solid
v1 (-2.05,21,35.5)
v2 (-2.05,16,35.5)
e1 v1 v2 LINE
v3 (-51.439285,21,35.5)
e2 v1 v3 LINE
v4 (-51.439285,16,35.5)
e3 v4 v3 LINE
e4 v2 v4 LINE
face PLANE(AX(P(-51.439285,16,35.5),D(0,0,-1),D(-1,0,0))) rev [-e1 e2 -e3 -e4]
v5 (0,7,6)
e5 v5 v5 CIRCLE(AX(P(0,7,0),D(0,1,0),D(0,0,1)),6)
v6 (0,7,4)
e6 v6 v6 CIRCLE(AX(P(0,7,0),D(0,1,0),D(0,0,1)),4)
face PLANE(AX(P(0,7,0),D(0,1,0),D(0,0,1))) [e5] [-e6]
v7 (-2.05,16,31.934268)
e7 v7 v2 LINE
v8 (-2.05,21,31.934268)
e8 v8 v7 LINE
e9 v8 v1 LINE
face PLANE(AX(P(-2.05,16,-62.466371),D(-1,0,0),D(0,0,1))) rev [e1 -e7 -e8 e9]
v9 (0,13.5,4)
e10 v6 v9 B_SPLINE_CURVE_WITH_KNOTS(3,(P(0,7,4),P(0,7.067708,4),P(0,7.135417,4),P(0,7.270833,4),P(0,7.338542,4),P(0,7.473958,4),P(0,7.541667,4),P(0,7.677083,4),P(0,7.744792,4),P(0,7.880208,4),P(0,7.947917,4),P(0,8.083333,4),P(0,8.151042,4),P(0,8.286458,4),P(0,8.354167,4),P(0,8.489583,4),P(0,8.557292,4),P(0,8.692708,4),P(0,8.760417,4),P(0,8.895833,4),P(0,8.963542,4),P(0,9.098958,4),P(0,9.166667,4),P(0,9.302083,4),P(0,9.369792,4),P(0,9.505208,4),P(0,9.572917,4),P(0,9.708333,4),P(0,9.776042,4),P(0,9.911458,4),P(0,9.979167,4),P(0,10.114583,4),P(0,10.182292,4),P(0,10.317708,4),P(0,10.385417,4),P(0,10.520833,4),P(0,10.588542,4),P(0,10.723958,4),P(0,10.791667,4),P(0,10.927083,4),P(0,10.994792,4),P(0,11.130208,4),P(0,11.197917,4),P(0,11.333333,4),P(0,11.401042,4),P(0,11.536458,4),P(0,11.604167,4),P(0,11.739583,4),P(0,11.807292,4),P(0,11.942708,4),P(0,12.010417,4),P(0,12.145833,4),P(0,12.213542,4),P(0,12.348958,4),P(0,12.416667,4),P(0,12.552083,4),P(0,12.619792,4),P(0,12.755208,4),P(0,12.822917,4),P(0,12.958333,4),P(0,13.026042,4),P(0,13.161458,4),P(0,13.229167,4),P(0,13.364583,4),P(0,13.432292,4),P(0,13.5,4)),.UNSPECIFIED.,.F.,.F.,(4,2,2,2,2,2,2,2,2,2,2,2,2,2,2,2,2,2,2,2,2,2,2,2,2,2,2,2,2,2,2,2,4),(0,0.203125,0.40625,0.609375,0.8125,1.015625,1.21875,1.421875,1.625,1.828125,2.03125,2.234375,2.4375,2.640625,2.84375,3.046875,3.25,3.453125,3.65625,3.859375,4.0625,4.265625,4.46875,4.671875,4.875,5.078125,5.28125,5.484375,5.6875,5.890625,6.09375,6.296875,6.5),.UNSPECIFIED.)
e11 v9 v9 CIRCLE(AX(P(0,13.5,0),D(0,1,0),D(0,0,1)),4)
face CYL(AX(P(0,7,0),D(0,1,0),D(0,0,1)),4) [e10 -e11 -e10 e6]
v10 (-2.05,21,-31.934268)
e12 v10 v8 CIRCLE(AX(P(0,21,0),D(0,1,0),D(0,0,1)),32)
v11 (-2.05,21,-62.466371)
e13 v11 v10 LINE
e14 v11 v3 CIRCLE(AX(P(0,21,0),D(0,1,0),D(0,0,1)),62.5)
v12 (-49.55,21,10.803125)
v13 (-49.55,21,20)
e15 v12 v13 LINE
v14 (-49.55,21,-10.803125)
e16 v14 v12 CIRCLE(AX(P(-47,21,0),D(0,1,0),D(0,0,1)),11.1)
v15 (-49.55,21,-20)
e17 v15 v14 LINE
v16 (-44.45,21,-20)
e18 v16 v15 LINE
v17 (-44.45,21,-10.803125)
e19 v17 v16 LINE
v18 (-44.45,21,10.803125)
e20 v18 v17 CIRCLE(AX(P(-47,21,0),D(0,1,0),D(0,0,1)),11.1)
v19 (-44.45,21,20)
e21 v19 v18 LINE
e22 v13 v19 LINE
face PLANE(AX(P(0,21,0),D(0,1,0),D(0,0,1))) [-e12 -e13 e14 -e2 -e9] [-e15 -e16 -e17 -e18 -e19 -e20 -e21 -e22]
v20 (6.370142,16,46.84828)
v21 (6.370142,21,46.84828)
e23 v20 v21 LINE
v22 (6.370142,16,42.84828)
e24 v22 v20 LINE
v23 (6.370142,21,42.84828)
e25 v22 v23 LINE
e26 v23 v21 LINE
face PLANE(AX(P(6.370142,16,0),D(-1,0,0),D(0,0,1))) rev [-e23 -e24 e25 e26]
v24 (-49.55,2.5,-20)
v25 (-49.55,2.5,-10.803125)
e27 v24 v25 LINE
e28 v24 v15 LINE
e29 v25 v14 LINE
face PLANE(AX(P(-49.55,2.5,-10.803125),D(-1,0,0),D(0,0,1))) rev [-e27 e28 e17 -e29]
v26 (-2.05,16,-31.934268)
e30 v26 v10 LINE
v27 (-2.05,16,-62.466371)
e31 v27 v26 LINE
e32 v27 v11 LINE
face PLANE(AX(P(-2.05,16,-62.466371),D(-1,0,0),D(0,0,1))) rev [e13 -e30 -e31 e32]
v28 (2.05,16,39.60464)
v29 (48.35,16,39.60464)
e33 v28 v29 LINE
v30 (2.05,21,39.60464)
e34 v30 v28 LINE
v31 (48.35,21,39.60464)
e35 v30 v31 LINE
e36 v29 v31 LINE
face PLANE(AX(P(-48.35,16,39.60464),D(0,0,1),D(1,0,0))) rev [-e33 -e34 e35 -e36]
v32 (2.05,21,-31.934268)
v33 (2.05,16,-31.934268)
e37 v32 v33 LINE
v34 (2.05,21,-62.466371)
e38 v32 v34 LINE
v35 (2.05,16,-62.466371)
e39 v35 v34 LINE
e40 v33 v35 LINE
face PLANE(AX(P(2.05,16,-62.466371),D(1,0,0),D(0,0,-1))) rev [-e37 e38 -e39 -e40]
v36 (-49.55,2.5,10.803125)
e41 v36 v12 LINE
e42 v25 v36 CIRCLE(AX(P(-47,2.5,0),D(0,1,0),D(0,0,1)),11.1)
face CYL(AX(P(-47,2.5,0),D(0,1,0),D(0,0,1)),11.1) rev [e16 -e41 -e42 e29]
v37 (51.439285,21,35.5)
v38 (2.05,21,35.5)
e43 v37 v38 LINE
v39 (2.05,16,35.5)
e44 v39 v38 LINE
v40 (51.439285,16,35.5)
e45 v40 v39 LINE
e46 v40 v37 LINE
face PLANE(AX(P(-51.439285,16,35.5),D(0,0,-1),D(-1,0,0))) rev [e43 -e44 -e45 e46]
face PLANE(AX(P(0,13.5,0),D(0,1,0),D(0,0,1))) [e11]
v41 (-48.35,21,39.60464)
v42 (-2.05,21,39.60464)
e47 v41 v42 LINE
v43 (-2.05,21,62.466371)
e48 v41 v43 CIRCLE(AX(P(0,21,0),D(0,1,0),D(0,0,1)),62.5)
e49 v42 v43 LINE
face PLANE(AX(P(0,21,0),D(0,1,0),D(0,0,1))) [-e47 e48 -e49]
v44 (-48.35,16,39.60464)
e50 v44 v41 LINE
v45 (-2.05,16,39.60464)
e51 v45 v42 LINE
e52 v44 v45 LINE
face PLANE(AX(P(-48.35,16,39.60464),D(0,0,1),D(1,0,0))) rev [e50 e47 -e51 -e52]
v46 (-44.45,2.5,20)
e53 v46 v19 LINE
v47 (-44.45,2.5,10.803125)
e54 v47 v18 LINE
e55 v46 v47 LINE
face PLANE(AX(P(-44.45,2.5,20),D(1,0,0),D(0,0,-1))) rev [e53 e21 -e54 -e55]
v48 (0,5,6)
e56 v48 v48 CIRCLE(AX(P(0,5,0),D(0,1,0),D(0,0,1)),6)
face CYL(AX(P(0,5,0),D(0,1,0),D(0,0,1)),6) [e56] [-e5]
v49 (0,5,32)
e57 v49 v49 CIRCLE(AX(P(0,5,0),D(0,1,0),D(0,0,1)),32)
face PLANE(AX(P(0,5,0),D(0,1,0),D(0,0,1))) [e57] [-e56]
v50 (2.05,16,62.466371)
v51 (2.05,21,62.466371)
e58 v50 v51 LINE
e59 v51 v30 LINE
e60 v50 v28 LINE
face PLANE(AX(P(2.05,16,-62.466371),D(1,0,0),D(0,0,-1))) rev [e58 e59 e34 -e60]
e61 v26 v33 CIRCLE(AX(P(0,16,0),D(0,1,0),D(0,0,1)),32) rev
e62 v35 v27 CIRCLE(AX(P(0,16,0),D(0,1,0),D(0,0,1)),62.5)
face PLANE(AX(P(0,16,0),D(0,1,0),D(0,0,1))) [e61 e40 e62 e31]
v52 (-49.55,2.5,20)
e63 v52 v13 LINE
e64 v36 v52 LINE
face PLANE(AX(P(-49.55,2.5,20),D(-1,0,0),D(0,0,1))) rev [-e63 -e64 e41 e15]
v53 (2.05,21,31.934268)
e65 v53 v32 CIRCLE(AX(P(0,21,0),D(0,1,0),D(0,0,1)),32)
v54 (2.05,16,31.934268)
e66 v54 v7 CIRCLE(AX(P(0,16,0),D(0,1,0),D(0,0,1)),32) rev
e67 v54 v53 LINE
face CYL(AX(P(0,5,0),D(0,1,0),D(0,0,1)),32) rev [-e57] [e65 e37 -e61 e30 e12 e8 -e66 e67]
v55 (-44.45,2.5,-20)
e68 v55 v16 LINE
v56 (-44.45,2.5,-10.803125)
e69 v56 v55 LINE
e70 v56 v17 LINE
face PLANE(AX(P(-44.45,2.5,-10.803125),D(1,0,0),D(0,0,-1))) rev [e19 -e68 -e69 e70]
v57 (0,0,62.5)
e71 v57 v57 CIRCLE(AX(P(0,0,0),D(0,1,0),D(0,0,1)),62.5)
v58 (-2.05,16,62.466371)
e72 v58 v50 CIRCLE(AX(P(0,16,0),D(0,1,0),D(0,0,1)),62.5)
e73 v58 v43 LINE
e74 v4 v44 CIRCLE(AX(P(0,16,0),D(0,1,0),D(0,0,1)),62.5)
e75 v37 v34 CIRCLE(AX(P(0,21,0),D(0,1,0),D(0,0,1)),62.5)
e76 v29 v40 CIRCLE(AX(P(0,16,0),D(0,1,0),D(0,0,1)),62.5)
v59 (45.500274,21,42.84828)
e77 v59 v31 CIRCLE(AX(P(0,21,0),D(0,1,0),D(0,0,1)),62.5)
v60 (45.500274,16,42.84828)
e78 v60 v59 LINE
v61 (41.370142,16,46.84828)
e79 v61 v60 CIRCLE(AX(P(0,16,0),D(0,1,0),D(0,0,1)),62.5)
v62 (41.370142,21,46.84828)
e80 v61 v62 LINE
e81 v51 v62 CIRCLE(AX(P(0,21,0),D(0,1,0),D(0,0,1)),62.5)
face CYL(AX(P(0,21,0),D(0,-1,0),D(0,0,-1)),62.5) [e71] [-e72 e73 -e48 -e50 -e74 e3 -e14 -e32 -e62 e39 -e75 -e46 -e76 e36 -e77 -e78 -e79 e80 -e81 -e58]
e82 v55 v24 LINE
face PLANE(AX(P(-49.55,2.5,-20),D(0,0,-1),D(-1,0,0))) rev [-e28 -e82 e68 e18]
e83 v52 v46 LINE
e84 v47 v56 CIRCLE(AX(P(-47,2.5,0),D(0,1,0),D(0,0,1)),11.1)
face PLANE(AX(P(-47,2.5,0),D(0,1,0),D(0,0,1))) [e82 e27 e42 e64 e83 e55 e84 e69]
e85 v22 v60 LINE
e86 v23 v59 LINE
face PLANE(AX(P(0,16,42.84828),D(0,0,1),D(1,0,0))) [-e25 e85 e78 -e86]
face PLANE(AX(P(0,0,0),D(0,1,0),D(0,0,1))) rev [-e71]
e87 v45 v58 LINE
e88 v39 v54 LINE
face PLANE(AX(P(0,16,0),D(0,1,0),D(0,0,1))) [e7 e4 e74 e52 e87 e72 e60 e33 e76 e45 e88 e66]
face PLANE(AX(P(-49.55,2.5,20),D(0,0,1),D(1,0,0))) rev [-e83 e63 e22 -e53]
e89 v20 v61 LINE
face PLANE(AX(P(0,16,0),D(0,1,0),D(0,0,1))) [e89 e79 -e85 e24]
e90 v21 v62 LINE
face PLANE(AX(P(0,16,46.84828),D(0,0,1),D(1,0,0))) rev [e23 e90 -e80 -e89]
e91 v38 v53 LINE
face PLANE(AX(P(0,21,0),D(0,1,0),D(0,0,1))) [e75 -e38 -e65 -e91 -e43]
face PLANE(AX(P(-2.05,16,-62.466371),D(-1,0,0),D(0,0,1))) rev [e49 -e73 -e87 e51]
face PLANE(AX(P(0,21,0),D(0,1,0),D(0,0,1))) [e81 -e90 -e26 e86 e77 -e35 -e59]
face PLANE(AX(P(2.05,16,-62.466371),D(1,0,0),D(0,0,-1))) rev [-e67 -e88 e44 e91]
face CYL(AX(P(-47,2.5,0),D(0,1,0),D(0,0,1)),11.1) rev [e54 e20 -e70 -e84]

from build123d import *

# Parameters (mm, degrees)
SKETCH1_R           = 62.5
BOSS_EXTRUDE1_DEPTH = 21
SKETCH2_R           = 32
SKETCH2_R_2         = 6
CUT_EXTRUDE1_DEPTH  = 16
SKETCH3_R           = 6
SKETCH3_R_2         = 4
CUT_EXTRUDE2_DEPTH  = 14
SKETCH4_R           = 4
CUT_EXTRUDE3_DEPTH  = 7.5
CUT_EXTRUDE4_START  = -5
CUT_EXTRUDE4_DEPTH  = 5
CUT_EXTRUDE5_START  = -5
CUT_EXTRUDE5_DEPTH  = 5
CUT_EXTRUDE6_START  = -5
CUT_EXTRUDE6_DEPTH  = 5
CUT_EXTRUDE7_DEPTH  = 18.5


with BuildPart() as part:
    # Sketch1 → Boss-Extrude1 (new body)
    with BuildSketch(Plane(origin=(0, 0, 0), x_dir=(1, 0, 0), z_dir=(0, 1, 0))):
        Circle(SKETCH1_R)
    extrude(amount=BOSS_EXTRUDE1_DEPTH)

    # Sketch2 → Cut-Extrude1 (cut)
    with BuildSketch(Plane(origin=(0, 21, 0), x_dir=(1, 0, 0), z_dir=(0, 1, 0))):
        Circle(SKETCH2_R)
        Circle(SKETCH2_R_2, mode=Mode.SUBTRACT)
    extrude(amount=-CUT_EXTRUDE1_DEPTH, mode=Mode.SUBTRACT)

    # Sketch3 → Cut-Extrude2 (cut)
    with BuildSketch(Plane(origin=(0, 21, 0), x_dir=(1, 0, 0), z_dir=(0, 1, 0))):
        Circle(SKETCH3_R)
        Circle(SKETCH3_R_2, mode=Mode.SUBTRACT)
    extrude(amount=-CUT_EXTRUDE2_DEPTH, mode=Mode.SUBTRACT)

    # Sketch4 → Cut-Extrude3 (cut)
    with BuildSketch(Plane(origin=(0, 21, 0), x_dir=(1, 0, 0), z_dir=(0, 1, 0))):
        Circle(SKETCH4_R)
    extrude(amount=-CUT_EXTRUDE3_DEPTH, mode=Mode.SUBTRACT)

    # Sketch5 → Cut-Extrude4 (cut)
    with BuildSketch(Plane(origin=(0, 21, 0), x_dir=(1, 0, 0), z_dir=(0, 1, 0)).offset(CUT_EXTRUDE4_START)):
        with BuildLine():
            Line((2.05, 62.466370953), (2.05, -62.466370953))
            ThreePointArc((2.05, -62.466370953), (0, -62.5), (-2.05, -62.466370953))
            Line((-2.05, -62.466370953), (-2.05, 62.466370953))
            ThreePointArc((-2.05, 62.466370953), (0, 62.5), (2.05, 62.466370953))
        make_face()
    extrude(amount=CUT_EXTRUDE4_DEPTH, mode=Mode.SUBTRACT)

    # Sketch6 → Cut-Extrude5 (cut)
    with BuildSketch(Plane(origin=(0, 21, 0), x_dir=(1, 0, 0), z_dir=(0, 1, 0)).offset(CUT_EXTRUDE5_START)):
        with BuildLine():
            Line((-48.35, -39.60463988), (48.35, -39.60463988))
            ThreePointArc((48.35, -39.60463988), (49.936833573, -37.584074456), (51.439284598, -35.5))
            Line((51.439284598, -35.5), (-51.439284598, -35.5))
            ThreePointArc((-51.439284598, -35.5), (-49.936833573, -37.584074456), (-48.35, -39.60463988))
        make_face()
    extrude(amount=CUT_EXTRUDE5_DEPTH, mode=Mode.SUBTRACT)

    # Sketch9 → Cut-Extrude6 (cut)
    with BuildSketch(Plane(origin=(0, 21, 0), x_dir=(1, 0, 0), z_dir=(0, 1, 0)).offset(CUT_EXTRUDE6_START)):
        with BuildLine():
            Line((45.500273824, -42.848279801), (6.37014237, -42.848279801))
            Line((6.37014237, -42.848279801), (6.37014237, -46.848279801))
            Line((6.37014237, -46.848279801), (41.37014237, -46.848279801))
            ThreePointArc((41.37014237, -46.848279801), (43.481229311, -44.895798217), (45.500273824, -42.848279801))
        make_face()
    extrude(amount=CUT_EXTRUDE6_DEPTH, mode=Mode.SUBTRACT)

    # Sketch10 → Cut-Extrude7 (cut)
    with BuildSketch(Plane(origin=(0, 21, 0), x_dir=(1, 0, 0), z_dir=(0, 1, 0))):
        with BuildLine():
            Line((-49.55, 10.803124548), (-49.55, 20))
            Line((-49.55, 20), (-44.45, 20))
            Line((-44.45, 20), (-44.45, 10.803124548))
            ThreePointArc((-44.45, 10.803124548), (-35.9, 0), (-44.45, -10.803124548))
            Line((-44.45, -10.803124548), (-44.45, -20))
            Line((-44.45, -20), (-49.55, -20))
            Line((-49.55, -20), (-49.55, -10.803124548))
            ThreePointArc((-49.55, -10.803124548), (-58.1, 0), (-49.55, 10.803124548))
        make_face()
    extrude(amount=-CUT_EXTRUDE7_DEPTH, mode=Mode.SUBTRACT)


solid = part.part
